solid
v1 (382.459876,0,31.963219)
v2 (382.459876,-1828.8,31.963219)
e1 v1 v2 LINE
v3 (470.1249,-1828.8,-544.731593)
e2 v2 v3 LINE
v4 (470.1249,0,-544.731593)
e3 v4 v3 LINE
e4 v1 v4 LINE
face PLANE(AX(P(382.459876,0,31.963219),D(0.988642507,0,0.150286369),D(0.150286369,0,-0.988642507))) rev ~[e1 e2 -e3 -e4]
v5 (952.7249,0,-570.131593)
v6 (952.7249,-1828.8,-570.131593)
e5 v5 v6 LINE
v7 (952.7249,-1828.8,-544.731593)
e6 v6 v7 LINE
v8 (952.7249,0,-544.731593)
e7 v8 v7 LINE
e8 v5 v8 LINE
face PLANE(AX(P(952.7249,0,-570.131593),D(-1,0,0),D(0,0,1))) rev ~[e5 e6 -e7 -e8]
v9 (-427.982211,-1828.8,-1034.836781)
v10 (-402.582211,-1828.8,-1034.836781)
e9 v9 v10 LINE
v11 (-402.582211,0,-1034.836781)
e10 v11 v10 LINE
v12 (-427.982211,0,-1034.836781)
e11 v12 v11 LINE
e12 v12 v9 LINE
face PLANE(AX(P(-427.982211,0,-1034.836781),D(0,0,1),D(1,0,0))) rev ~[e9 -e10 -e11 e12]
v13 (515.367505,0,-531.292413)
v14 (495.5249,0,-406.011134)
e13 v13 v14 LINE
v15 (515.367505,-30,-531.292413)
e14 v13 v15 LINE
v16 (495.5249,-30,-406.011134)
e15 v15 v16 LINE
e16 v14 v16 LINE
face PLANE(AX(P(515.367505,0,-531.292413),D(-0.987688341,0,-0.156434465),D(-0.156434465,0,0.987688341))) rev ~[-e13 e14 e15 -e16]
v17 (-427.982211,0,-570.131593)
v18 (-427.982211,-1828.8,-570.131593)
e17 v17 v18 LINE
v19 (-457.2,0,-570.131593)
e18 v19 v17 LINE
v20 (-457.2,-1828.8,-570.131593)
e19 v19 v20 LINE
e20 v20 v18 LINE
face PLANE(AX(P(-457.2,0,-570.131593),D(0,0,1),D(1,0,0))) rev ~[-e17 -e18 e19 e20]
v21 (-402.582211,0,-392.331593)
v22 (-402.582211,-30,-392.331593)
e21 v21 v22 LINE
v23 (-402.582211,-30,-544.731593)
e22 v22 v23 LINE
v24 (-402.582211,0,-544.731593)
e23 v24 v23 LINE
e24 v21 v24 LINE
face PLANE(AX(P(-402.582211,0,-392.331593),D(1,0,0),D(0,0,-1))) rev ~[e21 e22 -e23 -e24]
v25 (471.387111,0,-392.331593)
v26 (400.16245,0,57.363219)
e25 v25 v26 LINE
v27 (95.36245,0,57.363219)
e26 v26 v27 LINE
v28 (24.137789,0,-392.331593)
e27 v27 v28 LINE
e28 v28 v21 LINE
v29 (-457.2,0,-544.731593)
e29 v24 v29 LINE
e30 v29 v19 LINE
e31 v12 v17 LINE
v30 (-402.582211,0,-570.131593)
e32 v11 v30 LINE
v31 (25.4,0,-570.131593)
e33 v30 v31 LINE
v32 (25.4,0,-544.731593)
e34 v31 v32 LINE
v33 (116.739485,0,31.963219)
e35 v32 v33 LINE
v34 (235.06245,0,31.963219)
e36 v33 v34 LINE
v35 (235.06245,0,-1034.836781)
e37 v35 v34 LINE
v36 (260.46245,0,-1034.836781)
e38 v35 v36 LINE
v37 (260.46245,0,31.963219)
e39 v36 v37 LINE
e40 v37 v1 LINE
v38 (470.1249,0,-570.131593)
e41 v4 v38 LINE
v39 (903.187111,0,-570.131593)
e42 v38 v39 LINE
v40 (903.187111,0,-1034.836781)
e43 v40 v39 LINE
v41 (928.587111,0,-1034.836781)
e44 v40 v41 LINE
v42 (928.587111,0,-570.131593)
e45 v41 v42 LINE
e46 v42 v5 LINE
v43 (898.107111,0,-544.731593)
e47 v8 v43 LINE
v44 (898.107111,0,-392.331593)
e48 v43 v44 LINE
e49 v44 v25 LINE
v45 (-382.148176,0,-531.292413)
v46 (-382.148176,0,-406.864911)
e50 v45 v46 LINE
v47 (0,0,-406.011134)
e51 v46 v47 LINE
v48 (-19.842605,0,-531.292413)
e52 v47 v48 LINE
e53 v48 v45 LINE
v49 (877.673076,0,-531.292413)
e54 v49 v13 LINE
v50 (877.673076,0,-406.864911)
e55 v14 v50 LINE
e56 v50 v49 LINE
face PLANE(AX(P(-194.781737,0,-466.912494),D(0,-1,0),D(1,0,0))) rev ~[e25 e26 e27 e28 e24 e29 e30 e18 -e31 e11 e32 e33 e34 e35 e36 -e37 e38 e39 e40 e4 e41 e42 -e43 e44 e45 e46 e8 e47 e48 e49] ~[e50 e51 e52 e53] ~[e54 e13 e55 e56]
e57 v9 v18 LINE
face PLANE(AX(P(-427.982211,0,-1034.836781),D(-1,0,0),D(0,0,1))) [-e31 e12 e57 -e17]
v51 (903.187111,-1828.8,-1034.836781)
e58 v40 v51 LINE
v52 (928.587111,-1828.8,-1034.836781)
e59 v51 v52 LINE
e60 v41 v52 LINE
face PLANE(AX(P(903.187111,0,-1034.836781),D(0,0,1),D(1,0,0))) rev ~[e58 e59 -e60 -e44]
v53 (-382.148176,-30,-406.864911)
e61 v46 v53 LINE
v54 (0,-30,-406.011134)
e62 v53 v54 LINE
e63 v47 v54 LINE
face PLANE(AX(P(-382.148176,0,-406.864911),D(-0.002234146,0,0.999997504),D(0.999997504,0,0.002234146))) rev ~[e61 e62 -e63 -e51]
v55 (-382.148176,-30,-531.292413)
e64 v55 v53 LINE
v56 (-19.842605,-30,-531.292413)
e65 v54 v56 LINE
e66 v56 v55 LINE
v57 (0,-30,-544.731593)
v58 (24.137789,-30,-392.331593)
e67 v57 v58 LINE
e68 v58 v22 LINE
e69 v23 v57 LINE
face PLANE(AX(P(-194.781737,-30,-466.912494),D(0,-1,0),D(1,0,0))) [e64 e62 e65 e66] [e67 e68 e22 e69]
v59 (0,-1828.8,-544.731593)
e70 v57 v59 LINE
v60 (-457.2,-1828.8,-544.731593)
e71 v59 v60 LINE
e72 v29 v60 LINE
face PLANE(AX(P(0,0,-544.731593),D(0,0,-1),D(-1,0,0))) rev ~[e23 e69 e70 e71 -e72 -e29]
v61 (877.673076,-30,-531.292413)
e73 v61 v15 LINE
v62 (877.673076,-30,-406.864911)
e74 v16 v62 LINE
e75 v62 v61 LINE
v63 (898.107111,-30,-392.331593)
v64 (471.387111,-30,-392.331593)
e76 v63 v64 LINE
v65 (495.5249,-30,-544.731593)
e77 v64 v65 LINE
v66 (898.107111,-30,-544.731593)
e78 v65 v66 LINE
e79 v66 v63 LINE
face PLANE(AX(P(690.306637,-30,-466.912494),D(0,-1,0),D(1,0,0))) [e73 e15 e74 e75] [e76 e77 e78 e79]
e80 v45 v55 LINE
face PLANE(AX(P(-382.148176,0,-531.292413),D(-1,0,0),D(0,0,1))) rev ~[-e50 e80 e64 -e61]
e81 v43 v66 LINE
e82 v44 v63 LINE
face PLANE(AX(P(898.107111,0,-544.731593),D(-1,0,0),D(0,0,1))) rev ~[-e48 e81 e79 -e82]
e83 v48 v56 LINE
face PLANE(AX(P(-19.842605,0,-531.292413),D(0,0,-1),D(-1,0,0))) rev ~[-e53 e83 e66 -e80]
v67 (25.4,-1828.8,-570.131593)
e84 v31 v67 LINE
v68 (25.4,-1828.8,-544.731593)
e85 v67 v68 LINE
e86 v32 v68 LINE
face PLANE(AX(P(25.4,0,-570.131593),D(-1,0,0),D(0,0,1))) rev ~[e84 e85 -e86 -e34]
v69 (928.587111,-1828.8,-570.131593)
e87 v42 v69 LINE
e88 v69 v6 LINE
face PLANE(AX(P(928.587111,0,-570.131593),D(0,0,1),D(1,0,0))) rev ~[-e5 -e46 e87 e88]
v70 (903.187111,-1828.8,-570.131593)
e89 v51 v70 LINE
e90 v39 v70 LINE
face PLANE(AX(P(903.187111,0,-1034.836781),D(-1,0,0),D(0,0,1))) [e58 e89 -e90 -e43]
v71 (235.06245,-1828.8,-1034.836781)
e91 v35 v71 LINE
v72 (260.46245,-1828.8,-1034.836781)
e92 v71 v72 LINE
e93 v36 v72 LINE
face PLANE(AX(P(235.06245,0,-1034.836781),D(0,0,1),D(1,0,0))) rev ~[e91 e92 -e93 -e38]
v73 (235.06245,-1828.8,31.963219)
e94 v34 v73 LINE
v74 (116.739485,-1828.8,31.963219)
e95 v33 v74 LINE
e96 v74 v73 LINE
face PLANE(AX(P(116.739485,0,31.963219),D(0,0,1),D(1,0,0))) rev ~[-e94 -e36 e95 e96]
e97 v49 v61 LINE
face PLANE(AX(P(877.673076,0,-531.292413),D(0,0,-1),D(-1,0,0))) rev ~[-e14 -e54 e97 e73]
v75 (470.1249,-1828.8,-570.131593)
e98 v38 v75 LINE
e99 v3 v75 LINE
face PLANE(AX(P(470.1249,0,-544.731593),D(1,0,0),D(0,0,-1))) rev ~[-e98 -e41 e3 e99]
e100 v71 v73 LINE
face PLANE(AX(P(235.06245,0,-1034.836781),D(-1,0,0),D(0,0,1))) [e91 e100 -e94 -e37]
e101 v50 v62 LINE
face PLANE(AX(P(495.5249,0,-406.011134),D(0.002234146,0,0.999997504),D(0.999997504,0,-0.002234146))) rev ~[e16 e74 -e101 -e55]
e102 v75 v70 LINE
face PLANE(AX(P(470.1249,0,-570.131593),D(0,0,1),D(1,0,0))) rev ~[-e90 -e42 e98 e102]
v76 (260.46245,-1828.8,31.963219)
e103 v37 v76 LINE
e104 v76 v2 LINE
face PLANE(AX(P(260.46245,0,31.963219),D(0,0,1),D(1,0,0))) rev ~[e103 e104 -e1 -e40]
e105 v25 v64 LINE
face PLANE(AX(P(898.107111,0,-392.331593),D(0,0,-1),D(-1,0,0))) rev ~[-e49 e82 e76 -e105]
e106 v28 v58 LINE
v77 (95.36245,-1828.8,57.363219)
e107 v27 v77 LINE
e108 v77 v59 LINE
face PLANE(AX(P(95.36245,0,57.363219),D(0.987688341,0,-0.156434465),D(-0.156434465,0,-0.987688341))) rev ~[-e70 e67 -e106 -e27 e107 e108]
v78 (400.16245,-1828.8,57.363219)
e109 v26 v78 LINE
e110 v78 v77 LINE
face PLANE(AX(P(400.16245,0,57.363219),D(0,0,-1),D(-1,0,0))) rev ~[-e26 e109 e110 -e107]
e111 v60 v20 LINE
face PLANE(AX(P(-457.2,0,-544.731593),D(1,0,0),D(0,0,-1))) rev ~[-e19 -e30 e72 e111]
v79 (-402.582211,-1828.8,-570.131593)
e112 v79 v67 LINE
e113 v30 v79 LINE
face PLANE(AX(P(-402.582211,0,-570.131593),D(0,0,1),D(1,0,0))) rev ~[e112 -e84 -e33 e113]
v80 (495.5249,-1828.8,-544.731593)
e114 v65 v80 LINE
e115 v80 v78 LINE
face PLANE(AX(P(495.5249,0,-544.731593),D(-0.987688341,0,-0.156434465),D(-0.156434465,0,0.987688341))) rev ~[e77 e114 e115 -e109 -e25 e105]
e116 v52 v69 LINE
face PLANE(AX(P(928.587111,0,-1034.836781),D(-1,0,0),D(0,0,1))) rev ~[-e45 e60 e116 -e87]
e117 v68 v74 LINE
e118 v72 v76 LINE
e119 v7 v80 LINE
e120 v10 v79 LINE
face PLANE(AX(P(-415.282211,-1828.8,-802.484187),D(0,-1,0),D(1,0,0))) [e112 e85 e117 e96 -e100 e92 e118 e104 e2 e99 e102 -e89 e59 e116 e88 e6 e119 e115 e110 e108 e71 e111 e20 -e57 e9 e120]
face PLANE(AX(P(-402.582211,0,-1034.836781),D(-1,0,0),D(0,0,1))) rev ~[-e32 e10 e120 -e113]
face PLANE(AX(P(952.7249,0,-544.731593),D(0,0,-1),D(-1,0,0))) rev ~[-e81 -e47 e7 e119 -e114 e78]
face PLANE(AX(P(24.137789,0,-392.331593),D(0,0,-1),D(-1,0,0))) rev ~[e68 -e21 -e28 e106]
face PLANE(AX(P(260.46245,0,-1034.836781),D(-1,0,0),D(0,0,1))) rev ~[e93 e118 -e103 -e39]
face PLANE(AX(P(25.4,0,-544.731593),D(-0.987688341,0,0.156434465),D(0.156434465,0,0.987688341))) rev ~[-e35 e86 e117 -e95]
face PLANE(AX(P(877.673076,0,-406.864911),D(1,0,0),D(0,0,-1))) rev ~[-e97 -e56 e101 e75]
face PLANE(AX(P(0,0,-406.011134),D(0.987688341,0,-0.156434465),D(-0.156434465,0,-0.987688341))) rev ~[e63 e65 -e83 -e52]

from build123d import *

# Parameters (mm, degrees)
F0_W     = 25.4
F0_H     = 464.7051875732
F0_H_2   = 1066.8
F0_H_3   = 25.4
F1_DEPTH = 1828.8
F2_DEPTH = 30


# Not quite as in the source:
# - a feature names something its author has since deleted; it is built from what else it names


with BuildPart() as f1:
    # F0 (on Front) → F1 (new body)
    with BuildSketch(Plane.XZ):
        with Locations((-415.2822112945, -802.4841870543)):
            Rectangle(F0_W, F0_H)
        with Locations((247.7624498885, -501.4367808409)):
            Rectangle(F0_W, F0_H_2)
        with Locations((915.8871110716, -802.4841870543)):
            Rectangle(F0_W, F0_H)
        with Locations((12.7, -557.4315932677)):
            Rectangle(F0_W, F0_H_3)
        Polygon((145.9203362465, 57.3632191591), (95.3624498885, 57.3632191591), (24.1377887055, -392.3315932677), (0, -544.7315932677), (25.4, -544.7315932677), (116.7394851043, 31.9632191591), (145.9203362465, 31.9632191591), align=None)
        Polygon((362.7394139767, 57.3632191591), (145.9203362465, 57.3632191591), (145.9203362465, 31.9632191591), (235.0624498885, 31.9632191591), (260.4624498885, 31.9632191591), (362.7394139767, 31.9632191591), align=None)
        Polygon((898.1071110716, -544.7315932677), (495.524899777, -544.7315932677), (470.124899777, -544.7315932677), (470.124899777, -570.1315932677), (903.1871110716, -570.1315932677), (928.5871110716, -570.1315932677), (952.7248997771, -570.1315932677), (952.724899777, -544.7315932677), align=None)
        Polygon((400.1624498885, 57.3632191591), (362.7394139767, 57.3632191591), (362.7394139767, 31.9632191591), (382.4598755032, 31.9632191591), (470.124899777, -544.7315932677), (495.524899777, -544.7315932677), (471.3871110716, -392.3315932677), align=None)
        Polygon((0, -570.1315932677), (0, -544.7315932677), (-402.5822112945, -544.7315932677), (-457.2, -544.7315932677), (-457.2, -570.1315932677), (-427.9822112945, -570.1315932677), (-402.5822112945, -570.1315932677), align=None)
    extrude(amount=F1_DEPTH)

    # F0 (on Front) → F2 (join)
    with BuildSketch(Plane.XZ):
        Polygon((0, -544.7315932677), (24.1377887055, -392.3315932677), (-402.5822112945, -392.3315932677), (-402.5822112945, -544.7315932677), align=None)
        Polygon((-382.1481764317, -406.8649113178), (0, -406.0111343861), (-19.8426051641, -531.2924127962), (-382.1481764317, -531.2924127962), align=None, mode=Mode.SUBTRACT)
        Polygon((898.1071110716, -392.3315932677), (471.3871110716, -392.3315932677), (495.524899777, -544.7315932677), (898.1071110716, -544.7315932677), align=None)
        Polygon((495.524899777, -406.0111343861), (877.6730762087, -406.8649113178), (877.6730762087, -531.2924127962), (515.3675049412, -531.2924127962), align=None, mode=Mode.SUBTRACT)
    extrude(amount=F2_DEPTH)


solid = f1.part
